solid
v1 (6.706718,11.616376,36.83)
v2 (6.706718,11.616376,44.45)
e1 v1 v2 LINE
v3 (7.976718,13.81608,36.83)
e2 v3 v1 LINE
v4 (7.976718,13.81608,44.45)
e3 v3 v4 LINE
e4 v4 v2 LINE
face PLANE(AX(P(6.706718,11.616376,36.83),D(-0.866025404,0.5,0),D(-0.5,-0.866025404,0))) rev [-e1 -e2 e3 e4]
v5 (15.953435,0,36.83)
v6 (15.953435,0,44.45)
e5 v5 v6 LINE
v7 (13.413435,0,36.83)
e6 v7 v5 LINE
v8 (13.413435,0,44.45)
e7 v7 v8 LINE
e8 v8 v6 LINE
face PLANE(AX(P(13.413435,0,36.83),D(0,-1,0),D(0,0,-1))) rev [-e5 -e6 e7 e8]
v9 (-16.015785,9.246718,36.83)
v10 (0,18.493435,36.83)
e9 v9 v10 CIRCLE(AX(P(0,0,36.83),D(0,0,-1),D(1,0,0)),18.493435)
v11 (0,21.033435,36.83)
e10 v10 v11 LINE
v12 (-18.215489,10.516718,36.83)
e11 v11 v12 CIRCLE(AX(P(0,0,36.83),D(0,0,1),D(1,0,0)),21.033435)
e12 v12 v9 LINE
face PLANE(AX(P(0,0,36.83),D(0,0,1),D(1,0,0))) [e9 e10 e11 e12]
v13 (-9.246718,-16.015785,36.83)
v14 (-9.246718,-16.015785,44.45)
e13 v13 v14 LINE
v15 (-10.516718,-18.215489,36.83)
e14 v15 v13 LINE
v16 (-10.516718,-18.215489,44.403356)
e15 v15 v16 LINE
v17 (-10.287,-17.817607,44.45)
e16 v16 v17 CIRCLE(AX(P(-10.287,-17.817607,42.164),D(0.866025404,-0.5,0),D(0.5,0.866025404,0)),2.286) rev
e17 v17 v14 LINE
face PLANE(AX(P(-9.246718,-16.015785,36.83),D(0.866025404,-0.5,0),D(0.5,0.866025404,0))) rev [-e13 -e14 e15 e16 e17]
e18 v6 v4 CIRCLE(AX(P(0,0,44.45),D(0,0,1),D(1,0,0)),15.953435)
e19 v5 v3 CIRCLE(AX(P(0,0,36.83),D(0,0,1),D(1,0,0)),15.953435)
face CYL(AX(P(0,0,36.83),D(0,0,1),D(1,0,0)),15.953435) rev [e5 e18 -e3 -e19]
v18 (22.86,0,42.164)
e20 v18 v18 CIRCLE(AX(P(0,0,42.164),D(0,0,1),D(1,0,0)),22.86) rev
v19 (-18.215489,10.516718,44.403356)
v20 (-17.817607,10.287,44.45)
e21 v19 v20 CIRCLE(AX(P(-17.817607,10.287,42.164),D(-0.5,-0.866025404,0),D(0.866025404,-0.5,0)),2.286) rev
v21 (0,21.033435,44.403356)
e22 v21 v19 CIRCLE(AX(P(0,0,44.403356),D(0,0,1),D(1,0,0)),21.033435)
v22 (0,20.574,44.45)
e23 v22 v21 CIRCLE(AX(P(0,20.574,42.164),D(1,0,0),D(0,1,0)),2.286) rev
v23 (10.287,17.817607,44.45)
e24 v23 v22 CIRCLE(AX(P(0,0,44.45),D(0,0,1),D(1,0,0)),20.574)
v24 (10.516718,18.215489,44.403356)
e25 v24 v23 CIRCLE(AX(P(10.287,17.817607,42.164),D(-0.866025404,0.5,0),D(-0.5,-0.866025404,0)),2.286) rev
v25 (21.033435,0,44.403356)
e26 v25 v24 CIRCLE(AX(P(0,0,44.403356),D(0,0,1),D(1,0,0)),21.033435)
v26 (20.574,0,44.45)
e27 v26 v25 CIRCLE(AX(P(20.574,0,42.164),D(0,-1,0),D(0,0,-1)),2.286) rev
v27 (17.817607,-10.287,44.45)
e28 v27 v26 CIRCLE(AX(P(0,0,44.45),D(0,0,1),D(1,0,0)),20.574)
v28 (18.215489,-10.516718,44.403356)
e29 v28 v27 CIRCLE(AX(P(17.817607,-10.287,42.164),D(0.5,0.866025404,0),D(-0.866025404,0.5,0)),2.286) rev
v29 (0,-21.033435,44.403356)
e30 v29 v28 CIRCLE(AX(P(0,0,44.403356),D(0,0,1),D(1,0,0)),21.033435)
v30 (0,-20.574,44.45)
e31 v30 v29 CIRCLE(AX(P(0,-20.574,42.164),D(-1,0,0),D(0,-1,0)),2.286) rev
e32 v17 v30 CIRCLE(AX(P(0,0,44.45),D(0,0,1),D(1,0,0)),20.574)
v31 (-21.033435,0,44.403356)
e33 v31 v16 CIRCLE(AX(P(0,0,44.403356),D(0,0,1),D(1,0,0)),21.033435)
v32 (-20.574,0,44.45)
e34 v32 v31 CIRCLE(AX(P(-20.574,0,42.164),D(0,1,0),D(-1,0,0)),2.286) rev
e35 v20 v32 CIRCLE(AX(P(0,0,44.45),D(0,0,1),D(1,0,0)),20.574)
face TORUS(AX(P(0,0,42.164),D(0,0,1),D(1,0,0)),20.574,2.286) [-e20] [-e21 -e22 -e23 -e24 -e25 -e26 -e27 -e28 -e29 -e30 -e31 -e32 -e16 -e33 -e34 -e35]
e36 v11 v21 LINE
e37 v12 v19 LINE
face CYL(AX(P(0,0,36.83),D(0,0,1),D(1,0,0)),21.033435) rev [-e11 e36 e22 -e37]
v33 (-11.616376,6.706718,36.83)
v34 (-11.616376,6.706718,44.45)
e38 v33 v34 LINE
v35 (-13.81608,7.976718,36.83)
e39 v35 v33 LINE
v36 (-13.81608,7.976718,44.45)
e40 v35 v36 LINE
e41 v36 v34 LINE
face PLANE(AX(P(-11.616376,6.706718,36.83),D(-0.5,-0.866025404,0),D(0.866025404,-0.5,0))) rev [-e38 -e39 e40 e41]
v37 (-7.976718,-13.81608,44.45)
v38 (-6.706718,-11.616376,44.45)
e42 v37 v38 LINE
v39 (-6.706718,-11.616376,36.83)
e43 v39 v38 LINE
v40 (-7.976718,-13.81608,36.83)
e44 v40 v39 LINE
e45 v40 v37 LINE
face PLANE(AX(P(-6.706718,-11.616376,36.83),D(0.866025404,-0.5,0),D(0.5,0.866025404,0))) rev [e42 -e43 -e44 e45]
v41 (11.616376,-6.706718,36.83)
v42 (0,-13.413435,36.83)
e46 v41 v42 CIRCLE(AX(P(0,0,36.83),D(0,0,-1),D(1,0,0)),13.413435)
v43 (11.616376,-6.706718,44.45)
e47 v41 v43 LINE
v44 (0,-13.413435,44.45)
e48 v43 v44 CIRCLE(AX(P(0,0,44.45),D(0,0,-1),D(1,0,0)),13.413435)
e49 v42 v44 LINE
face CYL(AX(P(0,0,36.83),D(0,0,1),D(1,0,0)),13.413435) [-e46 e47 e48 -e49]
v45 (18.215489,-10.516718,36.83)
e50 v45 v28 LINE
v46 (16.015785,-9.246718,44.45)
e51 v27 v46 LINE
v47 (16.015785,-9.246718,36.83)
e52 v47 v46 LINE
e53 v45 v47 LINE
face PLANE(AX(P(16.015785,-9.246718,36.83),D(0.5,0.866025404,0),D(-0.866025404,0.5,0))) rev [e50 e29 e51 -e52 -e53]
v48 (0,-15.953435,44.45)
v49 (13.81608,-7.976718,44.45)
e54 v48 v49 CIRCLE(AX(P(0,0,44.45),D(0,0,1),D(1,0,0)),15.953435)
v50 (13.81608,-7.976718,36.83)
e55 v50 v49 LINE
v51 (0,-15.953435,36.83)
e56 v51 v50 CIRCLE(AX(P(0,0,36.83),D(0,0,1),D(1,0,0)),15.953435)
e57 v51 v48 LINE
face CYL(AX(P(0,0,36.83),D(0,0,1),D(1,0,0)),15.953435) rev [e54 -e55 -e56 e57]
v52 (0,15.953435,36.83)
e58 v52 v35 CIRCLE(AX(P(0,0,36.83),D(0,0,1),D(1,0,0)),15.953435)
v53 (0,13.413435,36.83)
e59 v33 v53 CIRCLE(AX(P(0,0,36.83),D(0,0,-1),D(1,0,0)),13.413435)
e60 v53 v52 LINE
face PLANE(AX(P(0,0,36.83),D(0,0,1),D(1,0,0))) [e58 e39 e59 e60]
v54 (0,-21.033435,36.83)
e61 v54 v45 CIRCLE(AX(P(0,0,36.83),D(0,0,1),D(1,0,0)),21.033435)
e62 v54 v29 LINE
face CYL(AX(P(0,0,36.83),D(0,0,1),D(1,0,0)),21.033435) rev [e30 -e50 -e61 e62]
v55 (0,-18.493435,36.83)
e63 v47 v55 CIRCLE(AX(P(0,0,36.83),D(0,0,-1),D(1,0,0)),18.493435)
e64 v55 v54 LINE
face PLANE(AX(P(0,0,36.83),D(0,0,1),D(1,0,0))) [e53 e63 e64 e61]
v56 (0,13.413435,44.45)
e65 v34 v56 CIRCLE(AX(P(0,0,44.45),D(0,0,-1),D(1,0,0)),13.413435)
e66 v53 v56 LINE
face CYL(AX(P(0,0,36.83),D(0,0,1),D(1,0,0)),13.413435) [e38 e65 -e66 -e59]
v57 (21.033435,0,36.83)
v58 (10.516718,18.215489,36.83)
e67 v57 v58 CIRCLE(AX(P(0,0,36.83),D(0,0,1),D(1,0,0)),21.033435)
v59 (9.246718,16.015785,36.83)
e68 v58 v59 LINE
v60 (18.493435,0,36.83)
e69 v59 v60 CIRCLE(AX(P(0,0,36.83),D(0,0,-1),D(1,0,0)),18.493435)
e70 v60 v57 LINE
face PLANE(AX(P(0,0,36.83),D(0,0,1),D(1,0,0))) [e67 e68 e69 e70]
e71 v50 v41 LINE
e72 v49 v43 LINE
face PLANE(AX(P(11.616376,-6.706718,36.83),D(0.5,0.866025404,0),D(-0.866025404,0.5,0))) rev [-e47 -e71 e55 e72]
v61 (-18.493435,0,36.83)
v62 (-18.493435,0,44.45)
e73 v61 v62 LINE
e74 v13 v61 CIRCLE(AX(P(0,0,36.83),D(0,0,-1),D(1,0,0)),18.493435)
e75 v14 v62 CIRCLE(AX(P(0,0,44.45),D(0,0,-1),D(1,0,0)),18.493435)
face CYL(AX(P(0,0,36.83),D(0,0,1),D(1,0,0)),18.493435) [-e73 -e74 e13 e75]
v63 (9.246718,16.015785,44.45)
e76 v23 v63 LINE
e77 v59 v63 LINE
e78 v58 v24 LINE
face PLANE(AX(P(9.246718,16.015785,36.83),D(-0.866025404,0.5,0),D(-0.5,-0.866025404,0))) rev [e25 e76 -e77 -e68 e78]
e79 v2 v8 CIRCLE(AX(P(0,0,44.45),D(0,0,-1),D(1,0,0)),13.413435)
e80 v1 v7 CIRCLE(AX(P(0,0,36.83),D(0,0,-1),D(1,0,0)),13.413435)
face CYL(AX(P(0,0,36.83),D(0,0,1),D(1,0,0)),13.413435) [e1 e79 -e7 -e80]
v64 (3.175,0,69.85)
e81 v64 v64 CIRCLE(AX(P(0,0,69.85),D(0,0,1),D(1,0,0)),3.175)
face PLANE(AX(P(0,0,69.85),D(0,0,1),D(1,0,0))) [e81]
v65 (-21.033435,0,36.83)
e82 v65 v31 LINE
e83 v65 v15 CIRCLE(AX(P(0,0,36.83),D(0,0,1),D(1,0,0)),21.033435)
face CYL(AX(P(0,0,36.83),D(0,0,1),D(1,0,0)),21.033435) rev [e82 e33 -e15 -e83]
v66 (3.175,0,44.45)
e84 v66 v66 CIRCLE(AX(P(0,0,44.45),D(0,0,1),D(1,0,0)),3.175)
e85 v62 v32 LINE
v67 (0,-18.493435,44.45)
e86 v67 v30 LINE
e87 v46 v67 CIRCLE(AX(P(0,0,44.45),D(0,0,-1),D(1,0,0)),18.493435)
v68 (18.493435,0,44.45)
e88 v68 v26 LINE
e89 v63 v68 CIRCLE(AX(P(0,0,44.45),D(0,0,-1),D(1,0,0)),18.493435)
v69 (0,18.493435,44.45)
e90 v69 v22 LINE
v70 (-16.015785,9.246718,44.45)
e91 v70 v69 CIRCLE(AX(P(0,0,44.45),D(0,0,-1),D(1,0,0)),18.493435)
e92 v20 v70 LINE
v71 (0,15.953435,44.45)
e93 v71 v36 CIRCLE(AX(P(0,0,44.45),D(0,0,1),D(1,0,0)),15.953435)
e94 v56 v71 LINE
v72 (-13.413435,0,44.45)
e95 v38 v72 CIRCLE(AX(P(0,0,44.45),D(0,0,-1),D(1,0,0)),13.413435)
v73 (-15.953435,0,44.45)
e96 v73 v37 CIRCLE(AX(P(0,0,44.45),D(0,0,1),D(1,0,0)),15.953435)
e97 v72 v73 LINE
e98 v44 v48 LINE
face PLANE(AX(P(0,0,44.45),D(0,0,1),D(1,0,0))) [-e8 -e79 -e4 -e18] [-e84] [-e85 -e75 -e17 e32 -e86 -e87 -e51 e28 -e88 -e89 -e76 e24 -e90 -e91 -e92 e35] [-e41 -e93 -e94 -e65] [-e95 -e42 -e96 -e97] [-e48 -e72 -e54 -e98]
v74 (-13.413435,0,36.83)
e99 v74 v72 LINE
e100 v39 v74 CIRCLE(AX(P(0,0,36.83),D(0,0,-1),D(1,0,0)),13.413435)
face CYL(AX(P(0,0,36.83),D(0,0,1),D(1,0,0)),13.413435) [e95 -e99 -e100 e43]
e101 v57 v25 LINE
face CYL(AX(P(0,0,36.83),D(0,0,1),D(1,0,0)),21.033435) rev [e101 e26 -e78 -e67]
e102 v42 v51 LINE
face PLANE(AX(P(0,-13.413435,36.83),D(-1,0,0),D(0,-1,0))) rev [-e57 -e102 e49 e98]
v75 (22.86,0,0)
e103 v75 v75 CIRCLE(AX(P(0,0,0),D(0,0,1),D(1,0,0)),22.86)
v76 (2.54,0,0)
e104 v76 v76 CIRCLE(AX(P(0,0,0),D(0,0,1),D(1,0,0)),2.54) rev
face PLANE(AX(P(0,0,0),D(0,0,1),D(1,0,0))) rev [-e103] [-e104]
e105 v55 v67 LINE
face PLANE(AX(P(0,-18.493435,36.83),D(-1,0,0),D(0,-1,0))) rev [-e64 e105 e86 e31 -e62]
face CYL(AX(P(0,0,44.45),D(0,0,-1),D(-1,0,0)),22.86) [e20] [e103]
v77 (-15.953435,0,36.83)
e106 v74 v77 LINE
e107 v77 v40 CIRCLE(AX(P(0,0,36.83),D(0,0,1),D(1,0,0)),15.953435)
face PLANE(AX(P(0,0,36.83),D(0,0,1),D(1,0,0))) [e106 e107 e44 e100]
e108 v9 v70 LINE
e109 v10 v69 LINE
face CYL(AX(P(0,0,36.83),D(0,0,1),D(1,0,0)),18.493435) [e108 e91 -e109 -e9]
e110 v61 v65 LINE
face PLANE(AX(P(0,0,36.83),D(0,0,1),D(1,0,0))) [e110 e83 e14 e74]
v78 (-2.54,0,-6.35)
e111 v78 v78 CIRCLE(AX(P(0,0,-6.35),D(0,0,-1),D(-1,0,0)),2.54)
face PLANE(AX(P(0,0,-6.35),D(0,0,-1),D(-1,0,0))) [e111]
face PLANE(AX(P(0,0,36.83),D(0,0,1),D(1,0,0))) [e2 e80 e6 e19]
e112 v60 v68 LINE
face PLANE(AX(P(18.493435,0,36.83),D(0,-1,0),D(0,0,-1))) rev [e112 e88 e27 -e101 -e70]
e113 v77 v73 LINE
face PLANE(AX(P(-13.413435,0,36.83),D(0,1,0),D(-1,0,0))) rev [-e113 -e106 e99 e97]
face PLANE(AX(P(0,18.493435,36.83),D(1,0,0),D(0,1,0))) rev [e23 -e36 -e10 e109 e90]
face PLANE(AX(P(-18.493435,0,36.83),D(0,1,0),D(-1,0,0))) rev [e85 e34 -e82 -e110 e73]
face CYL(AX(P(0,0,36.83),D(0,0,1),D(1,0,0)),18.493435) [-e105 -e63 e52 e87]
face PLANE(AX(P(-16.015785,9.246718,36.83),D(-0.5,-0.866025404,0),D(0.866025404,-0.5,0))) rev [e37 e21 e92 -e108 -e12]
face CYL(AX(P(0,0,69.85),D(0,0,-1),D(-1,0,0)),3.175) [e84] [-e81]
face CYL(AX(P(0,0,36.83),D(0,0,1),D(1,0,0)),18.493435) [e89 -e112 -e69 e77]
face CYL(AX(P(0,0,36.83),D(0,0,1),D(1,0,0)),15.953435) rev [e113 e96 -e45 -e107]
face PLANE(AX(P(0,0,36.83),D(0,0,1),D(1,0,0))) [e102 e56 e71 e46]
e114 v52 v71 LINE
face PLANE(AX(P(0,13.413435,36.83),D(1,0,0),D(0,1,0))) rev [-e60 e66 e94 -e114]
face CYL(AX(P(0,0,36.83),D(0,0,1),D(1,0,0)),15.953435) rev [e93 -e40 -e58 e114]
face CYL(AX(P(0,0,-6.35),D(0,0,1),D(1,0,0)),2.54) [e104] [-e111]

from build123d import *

# Parameters (mm, degrees)
SKETCH1_R           = 22.86
BOSS_EXTRUDE1_DEPTH = 44.45
SKETCH2_R           = 3.175
BOSS_EXTRUDE2_DEPTH = 25.4
CUT_EXTRUDE1_DEPTH  = 7.62
FILLET1_R           = 2.286
SKETCH4_R           = 2.54
BOSS_EXTRUDE3_DEPTH = 6.35


with BuildPart() as part:
    # Sketch1 → Boss-Extrude1 (new body)
    with BuildSketch(Plane.XY):
        Circle(SKETCH1_R)
    extrude(amount=BOSS_EXTRUDE1_DEPTH)

    # Sketch2 → Boss-Extrude2 (add)
    with BuildSketch(Plane.XY.offset(44.45)):
        Circle(SKETCH2_R)
    extrude(amount=BOSS_EXTRUDE2_DEPTH)

    # Sketch3 → Cut-Extrude1 (cut)
    with BuildSketch(Plane.XY.offset(44.45)):
        with BuildLine():
            Line((13.413435382, 0), (15.953435382, 0))
            ThreePointArc((15.953435382, 0), (13.816080318, 7.976717691), (7.976717691, 13.816080318))
            Line((7.976717691, 13.816080318), (6.706717691, 11.616375793))
            ThreePointArc((6.706717691, 11.616375793), (11.616375793, 6.706717691), (13.413435382, 0))
        make_face()
        with BuildLine():
            Line((9.246717691, 16.015784844), (10.516717691, 18.215489369))
            ThreePointArc((10.516717691, 18.215489369), (18.215489369, 10.516717691), (21.033435382, 0))
            Line((21.033435382, 0), (18.493435382, 0))
            ThreePointArc((18.493435382, 0), (16.015784844, 9.246717691), (9.246717691, 16.015784844))
        make_face()
        with BuildLine():
            Line((11.616375793, -6.706717691), (13.816080318, -7.976717691))
            ThreePointArc((13.816080318, -7.976717691), (7.976717691, -13.816080318), (0, -15.953435382))
            Line((0, -15.953435382), (0, -13.413435382))
            ThreePointArc((0, -13.413435382), (6.706717691, -11.616375793), (11.616375793, -6.706717691))
        make_face()
        with BuildLine():
            Line((16.015784844, -9.246717691), (18.215489369, -10.516717691))
            ThreePointArc((18.215489369, -10.516717691), (10.516717691, -18.215489369), (0, -21.033435382))
            Line((0, -21.033435382), (0, -18.493435382))
            ThreePointArc((0, -18.493435382), (9.246717691, -16.015784844), (16.015784844, -9.246717691))
        make_face()
        with BuildLine():
            Line((-6.706717691, -11.616375793), (-7.976717691, -13.816080318))
            ThreePointArc((-7.976717691, -13.816080318), (-13.816080318, -7.976717691), (-15.953435382, 0))
            Line((-15.953435382, 0), (-13.413435382, 0))
            ThreePointArc((-13.413435382, 0), (-11.616375793, -6.706717691), (-6.706717691, -11.616375793))
        make_face()
        with BuildLine():
            Line((-9.246717691, -16.015784844), (-10.516717691, -18.215489369))
            ThreePointArc((-10.516717691, -18.215489369), (-18.215489369, -10.516717691), (-21.033435382, 0))
            Line((-21.033435382, 0), (-18.493435382, 0))
            ThreePointArc((-18.493435382, 0), (-16.015784844, -9.246717691), (-9.246717691, -16.015784844))
        make_face()
        with BuildLine():
            Line((-11.616375793, 6.706717691), (-13.816080318, 7.976717691))
            ThreePointArc((-13.816080318, 7.976717691), (-7.976717691, 13.816080318), (0, 15.953435382))
            Line((0, 15.953435382), (0, 13.413435382))
            ThreePointArc((0, 13.413435382), (-6.706717691, 11.616375793), (-11.616375793, 6.706717691))
        make_face()
        with BuildLine():
            Line((-16.015784844, 9.246717691), (-18.215489369, 10.516717691))
            ThreePointArc((-18.215489369, 10.516717691), (-10.516717691, 18.215489369), (0, 21.033435382))
            Line((0, 21.033435382), (0, 18.493435382))
            ThreePointArc((0, 18.493435382), (-9.246717691, 16.015784844), (-16.015784844, 9.246717691))
        make_face()
    extrude(amount=-CUT_EXTRUDE1_DEPTH, mode=Mode.SUBTRACT)

    # Fillet1
    # the kernel refuses this fillet: 2.286 mm, written as the material it takes off along each edge
    with BuildSketch(Plane(origin=(0, 0, 44.45), x_dir=(1, 0, 0), z_dir=(0, -1, 0))) as fillet1_piece_1:
        with BuildLine():
            CenterArc((22.86 - FILLET1_R, -FILLET1_R), FILLET1_R, 0, 90)
            Line((22.86 - FILLET1_R, 0), (22.86, 0))
            Line((22.86, 0), (22.86, -FILLET1_R))
        make_face()
    revolve(axis=Axis((0, 0, 44.45), (0, 0, 1)), mode=Mode.SUBTRACT)

    # Sketch4 → Boss-Extrude3 (add)
    with BuildSketch(Plane(origin=(0, 0, 0), x_dir=(-1, 0, 0), z_dir=(0, 0, -1))):
        with Locations(Location((0, 0, 0), (0, 0, 180))):
            Circle(SKETCH4_R)
    extrude(amount=BOSS_EXTRUDE3_DEPTH)


solid = part.part
